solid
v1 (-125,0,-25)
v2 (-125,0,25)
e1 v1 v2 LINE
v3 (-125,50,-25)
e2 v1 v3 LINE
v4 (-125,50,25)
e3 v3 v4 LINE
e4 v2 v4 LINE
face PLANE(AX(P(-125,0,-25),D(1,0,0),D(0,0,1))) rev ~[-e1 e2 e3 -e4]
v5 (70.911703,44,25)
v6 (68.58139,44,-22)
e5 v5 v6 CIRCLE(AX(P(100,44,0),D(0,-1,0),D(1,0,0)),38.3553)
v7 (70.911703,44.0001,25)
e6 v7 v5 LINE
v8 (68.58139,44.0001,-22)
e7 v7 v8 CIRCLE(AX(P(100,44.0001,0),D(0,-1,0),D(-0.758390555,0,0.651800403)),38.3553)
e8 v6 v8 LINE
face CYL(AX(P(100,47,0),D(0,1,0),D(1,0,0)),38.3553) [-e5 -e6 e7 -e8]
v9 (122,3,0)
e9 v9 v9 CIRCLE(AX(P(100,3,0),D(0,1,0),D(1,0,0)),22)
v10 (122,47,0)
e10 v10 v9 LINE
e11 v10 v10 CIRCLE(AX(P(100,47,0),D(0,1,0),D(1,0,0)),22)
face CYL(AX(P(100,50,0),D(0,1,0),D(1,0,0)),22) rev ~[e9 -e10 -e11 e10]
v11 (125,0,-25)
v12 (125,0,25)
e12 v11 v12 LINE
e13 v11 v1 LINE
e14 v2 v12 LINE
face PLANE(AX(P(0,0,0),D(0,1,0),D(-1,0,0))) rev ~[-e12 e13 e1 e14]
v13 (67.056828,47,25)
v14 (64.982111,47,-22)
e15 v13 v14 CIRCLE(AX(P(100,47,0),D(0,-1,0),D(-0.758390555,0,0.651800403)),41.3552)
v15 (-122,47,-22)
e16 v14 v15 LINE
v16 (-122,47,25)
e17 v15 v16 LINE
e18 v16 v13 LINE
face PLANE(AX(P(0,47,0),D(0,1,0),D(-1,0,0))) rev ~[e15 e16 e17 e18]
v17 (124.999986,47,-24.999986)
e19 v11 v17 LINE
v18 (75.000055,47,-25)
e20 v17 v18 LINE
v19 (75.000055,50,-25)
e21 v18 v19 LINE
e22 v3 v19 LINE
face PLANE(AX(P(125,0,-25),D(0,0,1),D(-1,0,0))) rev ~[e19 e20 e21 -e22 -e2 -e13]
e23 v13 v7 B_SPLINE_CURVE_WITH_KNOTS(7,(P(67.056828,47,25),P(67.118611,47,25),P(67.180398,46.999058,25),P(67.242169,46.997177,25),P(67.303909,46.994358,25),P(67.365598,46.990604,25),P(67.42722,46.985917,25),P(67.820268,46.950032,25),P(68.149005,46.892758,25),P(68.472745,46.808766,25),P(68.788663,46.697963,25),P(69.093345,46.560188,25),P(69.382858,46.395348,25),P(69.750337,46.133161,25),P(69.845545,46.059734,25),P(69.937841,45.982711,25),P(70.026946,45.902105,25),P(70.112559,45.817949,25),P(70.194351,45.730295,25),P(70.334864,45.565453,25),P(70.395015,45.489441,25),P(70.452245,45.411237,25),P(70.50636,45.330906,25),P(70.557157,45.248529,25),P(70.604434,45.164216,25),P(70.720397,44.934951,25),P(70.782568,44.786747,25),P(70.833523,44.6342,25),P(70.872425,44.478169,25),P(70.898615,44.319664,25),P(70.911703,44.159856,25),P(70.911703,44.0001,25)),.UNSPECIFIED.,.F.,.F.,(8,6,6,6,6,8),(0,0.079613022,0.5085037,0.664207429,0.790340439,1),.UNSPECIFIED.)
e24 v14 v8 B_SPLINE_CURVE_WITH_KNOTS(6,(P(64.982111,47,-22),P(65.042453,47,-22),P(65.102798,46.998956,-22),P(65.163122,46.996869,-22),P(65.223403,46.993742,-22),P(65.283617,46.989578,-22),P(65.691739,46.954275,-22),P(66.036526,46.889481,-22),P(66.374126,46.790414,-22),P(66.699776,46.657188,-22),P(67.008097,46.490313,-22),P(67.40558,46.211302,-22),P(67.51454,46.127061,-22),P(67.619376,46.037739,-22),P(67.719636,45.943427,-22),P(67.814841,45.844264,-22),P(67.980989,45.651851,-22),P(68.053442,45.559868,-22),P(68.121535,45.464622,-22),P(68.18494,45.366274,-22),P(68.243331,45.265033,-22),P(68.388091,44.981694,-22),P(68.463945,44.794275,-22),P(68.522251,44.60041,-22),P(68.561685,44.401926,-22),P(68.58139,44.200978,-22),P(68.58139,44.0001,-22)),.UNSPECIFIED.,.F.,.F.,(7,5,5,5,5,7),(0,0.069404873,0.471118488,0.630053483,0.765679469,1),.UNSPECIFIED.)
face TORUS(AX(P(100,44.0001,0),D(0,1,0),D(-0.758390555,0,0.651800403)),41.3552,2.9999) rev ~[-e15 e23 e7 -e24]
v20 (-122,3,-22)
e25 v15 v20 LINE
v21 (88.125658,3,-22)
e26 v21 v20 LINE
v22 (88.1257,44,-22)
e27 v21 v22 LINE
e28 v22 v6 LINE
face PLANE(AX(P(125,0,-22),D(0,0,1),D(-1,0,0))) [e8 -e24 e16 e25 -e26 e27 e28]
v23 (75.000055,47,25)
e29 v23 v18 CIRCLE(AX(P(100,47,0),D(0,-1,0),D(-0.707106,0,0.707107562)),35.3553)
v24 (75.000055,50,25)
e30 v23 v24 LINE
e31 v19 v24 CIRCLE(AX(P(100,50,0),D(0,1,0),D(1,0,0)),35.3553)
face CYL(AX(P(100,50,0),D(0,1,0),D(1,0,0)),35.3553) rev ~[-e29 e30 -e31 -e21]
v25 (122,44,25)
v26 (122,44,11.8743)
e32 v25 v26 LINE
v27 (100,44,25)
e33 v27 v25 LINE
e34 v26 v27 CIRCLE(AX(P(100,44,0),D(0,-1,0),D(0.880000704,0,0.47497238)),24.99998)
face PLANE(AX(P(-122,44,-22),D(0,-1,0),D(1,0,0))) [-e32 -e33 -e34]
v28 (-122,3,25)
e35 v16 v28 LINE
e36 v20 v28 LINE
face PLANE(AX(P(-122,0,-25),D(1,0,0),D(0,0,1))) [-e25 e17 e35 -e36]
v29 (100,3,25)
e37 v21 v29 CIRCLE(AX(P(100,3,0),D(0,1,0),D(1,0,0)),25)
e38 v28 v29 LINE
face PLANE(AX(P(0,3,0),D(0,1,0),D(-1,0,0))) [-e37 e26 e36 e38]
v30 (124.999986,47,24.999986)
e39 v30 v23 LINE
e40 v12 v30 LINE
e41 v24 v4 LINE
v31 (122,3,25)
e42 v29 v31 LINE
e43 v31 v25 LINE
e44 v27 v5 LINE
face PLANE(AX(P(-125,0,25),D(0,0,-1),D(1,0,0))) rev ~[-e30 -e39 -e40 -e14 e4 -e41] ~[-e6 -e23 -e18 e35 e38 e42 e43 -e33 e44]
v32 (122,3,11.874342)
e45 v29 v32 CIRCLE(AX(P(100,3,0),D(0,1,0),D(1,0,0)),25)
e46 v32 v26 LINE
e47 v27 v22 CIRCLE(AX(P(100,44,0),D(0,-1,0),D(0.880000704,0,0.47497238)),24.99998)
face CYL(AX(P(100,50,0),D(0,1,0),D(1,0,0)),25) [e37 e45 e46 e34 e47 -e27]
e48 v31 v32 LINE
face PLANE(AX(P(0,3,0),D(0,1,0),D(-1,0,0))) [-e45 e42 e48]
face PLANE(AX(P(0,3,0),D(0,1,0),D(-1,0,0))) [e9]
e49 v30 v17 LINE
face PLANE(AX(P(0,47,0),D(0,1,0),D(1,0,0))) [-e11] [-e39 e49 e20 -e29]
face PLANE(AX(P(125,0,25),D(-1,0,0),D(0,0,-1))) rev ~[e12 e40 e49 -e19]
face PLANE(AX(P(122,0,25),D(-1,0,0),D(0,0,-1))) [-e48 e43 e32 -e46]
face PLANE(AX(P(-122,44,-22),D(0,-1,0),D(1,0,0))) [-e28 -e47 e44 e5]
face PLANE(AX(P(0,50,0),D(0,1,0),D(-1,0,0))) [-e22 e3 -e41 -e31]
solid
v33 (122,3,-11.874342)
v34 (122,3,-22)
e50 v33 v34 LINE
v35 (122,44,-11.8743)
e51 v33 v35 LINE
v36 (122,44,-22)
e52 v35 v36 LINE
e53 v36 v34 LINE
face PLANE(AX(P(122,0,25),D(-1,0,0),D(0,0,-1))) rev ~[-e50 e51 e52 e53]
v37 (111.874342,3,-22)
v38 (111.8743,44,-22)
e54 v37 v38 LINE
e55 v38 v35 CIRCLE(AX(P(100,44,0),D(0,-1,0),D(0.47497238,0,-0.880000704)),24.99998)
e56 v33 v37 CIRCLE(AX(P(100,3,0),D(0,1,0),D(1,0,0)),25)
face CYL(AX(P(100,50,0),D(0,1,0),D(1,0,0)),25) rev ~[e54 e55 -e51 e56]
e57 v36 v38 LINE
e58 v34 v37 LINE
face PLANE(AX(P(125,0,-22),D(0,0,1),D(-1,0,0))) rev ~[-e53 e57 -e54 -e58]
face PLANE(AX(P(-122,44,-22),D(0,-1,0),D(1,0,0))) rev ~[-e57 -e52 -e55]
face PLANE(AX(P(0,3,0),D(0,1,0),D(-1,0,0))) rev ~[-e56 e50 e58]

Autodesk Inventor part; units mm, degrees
ref_plane "YZ Plane" through (0, 0, 0) normal (1, 0, 0) x (0, 1, 0)
ref_plane "XZ Plane" through (0, 0, 0) normal (0, 1, 0) x (-1, 0, 0)
ref_plane "XY Plane" through (0, 0, 0) normal (0, 0, 1) x (1, 0, 0)
sketch "草圖1" plane through (0, 0, 0) normal (0, 1, 0) x (-1, 0, 0)
  line L0 (125, 25) -> (-125, 25)
  line L1 (-125, 25) -> (-125, -25)
  line L2 (-125, -25) -> (125, -25)
  line L3 (125, -25) -> (125, 25)
  line L4 (125, 25) -> (-125, -25) construction
  line L5 (-125, 25) -> (125, -25) construction
  point P0 (0, 0)
  dimension "d0" = 250
  dimension "d1" = 50
extrude "擠出1" add sketch "草圖1" along normal blind 50
shell "薄殼1" thickness 3 removed faces 1 at (-41.6667, 16.6667, 25)
sketch "草圖2" plane through (0, 50, 0) normal (0, 1, 0) x (1, 0, 0)
  line L0 (125, -25) -> (125, 25) construction
  line L1 (125, 25) -> (-125, 25) construction
  line L2 (-125, 25) -> (-125, -25) construction
  line L3 (-125, -25) -> (125, -25) construction
  circle A0 centre (100, 0) radius 25
  circle A1 centre (100, 0) radius 22
  point P0 (0, 0)
  point P1 (125, 0)
  dimension "d5" = 3
extrude "擠出2" add sketch "草圖2" against normal up to surface (50 mm away)
sketch "草圖4" plane through (0, 50, 0) normal (0, 1, 0) x (1, 0, 0)
  point P0 (0, 0)
sketch "草圖5" plane through (0, 50, 0) normal (0, 1, 0) x (1, 0, 0)
  line L0 (125, 25) -> (-125, 25) construction
  line L1 (-125, 25) -> (-125, -25) construction
  line L2 (-125, -25) -> (125, -25) construction
  line L3 (125, -25) -> (125, 25) construction
  line L4 (125, 0) -> (100, 0) construction
  line L5 (100, 0) -> (100, 25) construction
  line L6 (125, 25) -> (-125, 25) construction
  circle A0 centre (100, 0) radius 35.3553
  point P0 (0, 0)
extrude "擠出4" cut sketch "草圖5" against normal blind 3
sketch "草圖6" plane through (-122, 47, -22) normal (0, -1, 0) x (1, 0, 0)
  line L0 (210.1257, 0) -> (194.3233, 0) projected
  arc A0 (244, 33.8743) -> (210.1257, 0) centre (222, 22) ccw projected
  line L1 (244, 47) -> (244, 33.8743) projected
  line L2 (247, 47) -> (244, 47) projected
  line L3 (247, -3) -> (247, 47) projected
  line L4 (197, -3) -> (247, -3) projected
  arc A1 (194.3233, 0) -> (197, -3) centre (222, 22) ccw projected
  circle A2 centre (222, 22) radius 22 projected
  arc A3 (233.8743, 0) -> (244, 10.1257) centre (222, 22) ccw projected
  line L5 (244, 0) -> (233.8743, 0) projected
  line L6 (244, 10.1257) -> (244, 0) projected
  arc A4 (197, 47) -> (197, -3) centre (222, 22) ccw projected
  line L7 (197, -3) -> (-3, -3) projected
  line L8 (-3, -3) -> (-3, 47) projected
  line L9 (-3, 47) -> (197, 47) projected
  line L10 (197, 47) -> (244, 47)
  arc A5 (222, 47) -> (210.1257, 0) centre (222, 22) ccw projected
  circle A6 centre (222, 22) radius 38.3553
  point P0 (122, 22)
  point P1 (222, 47)
  point P2 (192.9117, 47)
  point P3 (192.9117, -3)
  point P4 (197, -3)
  dimension "d14" = 3
extrude "擠出5" add sketch "草圖6" along normal blind 3 contours L0 A4 L10 A0 | A1 L7 A6 L9 A4 | L10 L1 A0 | A3 L6 L5
fillet "圓角1" radius 3 1 edges at (61.6917, 47, 1.8994)
properties part number "Base_box"
